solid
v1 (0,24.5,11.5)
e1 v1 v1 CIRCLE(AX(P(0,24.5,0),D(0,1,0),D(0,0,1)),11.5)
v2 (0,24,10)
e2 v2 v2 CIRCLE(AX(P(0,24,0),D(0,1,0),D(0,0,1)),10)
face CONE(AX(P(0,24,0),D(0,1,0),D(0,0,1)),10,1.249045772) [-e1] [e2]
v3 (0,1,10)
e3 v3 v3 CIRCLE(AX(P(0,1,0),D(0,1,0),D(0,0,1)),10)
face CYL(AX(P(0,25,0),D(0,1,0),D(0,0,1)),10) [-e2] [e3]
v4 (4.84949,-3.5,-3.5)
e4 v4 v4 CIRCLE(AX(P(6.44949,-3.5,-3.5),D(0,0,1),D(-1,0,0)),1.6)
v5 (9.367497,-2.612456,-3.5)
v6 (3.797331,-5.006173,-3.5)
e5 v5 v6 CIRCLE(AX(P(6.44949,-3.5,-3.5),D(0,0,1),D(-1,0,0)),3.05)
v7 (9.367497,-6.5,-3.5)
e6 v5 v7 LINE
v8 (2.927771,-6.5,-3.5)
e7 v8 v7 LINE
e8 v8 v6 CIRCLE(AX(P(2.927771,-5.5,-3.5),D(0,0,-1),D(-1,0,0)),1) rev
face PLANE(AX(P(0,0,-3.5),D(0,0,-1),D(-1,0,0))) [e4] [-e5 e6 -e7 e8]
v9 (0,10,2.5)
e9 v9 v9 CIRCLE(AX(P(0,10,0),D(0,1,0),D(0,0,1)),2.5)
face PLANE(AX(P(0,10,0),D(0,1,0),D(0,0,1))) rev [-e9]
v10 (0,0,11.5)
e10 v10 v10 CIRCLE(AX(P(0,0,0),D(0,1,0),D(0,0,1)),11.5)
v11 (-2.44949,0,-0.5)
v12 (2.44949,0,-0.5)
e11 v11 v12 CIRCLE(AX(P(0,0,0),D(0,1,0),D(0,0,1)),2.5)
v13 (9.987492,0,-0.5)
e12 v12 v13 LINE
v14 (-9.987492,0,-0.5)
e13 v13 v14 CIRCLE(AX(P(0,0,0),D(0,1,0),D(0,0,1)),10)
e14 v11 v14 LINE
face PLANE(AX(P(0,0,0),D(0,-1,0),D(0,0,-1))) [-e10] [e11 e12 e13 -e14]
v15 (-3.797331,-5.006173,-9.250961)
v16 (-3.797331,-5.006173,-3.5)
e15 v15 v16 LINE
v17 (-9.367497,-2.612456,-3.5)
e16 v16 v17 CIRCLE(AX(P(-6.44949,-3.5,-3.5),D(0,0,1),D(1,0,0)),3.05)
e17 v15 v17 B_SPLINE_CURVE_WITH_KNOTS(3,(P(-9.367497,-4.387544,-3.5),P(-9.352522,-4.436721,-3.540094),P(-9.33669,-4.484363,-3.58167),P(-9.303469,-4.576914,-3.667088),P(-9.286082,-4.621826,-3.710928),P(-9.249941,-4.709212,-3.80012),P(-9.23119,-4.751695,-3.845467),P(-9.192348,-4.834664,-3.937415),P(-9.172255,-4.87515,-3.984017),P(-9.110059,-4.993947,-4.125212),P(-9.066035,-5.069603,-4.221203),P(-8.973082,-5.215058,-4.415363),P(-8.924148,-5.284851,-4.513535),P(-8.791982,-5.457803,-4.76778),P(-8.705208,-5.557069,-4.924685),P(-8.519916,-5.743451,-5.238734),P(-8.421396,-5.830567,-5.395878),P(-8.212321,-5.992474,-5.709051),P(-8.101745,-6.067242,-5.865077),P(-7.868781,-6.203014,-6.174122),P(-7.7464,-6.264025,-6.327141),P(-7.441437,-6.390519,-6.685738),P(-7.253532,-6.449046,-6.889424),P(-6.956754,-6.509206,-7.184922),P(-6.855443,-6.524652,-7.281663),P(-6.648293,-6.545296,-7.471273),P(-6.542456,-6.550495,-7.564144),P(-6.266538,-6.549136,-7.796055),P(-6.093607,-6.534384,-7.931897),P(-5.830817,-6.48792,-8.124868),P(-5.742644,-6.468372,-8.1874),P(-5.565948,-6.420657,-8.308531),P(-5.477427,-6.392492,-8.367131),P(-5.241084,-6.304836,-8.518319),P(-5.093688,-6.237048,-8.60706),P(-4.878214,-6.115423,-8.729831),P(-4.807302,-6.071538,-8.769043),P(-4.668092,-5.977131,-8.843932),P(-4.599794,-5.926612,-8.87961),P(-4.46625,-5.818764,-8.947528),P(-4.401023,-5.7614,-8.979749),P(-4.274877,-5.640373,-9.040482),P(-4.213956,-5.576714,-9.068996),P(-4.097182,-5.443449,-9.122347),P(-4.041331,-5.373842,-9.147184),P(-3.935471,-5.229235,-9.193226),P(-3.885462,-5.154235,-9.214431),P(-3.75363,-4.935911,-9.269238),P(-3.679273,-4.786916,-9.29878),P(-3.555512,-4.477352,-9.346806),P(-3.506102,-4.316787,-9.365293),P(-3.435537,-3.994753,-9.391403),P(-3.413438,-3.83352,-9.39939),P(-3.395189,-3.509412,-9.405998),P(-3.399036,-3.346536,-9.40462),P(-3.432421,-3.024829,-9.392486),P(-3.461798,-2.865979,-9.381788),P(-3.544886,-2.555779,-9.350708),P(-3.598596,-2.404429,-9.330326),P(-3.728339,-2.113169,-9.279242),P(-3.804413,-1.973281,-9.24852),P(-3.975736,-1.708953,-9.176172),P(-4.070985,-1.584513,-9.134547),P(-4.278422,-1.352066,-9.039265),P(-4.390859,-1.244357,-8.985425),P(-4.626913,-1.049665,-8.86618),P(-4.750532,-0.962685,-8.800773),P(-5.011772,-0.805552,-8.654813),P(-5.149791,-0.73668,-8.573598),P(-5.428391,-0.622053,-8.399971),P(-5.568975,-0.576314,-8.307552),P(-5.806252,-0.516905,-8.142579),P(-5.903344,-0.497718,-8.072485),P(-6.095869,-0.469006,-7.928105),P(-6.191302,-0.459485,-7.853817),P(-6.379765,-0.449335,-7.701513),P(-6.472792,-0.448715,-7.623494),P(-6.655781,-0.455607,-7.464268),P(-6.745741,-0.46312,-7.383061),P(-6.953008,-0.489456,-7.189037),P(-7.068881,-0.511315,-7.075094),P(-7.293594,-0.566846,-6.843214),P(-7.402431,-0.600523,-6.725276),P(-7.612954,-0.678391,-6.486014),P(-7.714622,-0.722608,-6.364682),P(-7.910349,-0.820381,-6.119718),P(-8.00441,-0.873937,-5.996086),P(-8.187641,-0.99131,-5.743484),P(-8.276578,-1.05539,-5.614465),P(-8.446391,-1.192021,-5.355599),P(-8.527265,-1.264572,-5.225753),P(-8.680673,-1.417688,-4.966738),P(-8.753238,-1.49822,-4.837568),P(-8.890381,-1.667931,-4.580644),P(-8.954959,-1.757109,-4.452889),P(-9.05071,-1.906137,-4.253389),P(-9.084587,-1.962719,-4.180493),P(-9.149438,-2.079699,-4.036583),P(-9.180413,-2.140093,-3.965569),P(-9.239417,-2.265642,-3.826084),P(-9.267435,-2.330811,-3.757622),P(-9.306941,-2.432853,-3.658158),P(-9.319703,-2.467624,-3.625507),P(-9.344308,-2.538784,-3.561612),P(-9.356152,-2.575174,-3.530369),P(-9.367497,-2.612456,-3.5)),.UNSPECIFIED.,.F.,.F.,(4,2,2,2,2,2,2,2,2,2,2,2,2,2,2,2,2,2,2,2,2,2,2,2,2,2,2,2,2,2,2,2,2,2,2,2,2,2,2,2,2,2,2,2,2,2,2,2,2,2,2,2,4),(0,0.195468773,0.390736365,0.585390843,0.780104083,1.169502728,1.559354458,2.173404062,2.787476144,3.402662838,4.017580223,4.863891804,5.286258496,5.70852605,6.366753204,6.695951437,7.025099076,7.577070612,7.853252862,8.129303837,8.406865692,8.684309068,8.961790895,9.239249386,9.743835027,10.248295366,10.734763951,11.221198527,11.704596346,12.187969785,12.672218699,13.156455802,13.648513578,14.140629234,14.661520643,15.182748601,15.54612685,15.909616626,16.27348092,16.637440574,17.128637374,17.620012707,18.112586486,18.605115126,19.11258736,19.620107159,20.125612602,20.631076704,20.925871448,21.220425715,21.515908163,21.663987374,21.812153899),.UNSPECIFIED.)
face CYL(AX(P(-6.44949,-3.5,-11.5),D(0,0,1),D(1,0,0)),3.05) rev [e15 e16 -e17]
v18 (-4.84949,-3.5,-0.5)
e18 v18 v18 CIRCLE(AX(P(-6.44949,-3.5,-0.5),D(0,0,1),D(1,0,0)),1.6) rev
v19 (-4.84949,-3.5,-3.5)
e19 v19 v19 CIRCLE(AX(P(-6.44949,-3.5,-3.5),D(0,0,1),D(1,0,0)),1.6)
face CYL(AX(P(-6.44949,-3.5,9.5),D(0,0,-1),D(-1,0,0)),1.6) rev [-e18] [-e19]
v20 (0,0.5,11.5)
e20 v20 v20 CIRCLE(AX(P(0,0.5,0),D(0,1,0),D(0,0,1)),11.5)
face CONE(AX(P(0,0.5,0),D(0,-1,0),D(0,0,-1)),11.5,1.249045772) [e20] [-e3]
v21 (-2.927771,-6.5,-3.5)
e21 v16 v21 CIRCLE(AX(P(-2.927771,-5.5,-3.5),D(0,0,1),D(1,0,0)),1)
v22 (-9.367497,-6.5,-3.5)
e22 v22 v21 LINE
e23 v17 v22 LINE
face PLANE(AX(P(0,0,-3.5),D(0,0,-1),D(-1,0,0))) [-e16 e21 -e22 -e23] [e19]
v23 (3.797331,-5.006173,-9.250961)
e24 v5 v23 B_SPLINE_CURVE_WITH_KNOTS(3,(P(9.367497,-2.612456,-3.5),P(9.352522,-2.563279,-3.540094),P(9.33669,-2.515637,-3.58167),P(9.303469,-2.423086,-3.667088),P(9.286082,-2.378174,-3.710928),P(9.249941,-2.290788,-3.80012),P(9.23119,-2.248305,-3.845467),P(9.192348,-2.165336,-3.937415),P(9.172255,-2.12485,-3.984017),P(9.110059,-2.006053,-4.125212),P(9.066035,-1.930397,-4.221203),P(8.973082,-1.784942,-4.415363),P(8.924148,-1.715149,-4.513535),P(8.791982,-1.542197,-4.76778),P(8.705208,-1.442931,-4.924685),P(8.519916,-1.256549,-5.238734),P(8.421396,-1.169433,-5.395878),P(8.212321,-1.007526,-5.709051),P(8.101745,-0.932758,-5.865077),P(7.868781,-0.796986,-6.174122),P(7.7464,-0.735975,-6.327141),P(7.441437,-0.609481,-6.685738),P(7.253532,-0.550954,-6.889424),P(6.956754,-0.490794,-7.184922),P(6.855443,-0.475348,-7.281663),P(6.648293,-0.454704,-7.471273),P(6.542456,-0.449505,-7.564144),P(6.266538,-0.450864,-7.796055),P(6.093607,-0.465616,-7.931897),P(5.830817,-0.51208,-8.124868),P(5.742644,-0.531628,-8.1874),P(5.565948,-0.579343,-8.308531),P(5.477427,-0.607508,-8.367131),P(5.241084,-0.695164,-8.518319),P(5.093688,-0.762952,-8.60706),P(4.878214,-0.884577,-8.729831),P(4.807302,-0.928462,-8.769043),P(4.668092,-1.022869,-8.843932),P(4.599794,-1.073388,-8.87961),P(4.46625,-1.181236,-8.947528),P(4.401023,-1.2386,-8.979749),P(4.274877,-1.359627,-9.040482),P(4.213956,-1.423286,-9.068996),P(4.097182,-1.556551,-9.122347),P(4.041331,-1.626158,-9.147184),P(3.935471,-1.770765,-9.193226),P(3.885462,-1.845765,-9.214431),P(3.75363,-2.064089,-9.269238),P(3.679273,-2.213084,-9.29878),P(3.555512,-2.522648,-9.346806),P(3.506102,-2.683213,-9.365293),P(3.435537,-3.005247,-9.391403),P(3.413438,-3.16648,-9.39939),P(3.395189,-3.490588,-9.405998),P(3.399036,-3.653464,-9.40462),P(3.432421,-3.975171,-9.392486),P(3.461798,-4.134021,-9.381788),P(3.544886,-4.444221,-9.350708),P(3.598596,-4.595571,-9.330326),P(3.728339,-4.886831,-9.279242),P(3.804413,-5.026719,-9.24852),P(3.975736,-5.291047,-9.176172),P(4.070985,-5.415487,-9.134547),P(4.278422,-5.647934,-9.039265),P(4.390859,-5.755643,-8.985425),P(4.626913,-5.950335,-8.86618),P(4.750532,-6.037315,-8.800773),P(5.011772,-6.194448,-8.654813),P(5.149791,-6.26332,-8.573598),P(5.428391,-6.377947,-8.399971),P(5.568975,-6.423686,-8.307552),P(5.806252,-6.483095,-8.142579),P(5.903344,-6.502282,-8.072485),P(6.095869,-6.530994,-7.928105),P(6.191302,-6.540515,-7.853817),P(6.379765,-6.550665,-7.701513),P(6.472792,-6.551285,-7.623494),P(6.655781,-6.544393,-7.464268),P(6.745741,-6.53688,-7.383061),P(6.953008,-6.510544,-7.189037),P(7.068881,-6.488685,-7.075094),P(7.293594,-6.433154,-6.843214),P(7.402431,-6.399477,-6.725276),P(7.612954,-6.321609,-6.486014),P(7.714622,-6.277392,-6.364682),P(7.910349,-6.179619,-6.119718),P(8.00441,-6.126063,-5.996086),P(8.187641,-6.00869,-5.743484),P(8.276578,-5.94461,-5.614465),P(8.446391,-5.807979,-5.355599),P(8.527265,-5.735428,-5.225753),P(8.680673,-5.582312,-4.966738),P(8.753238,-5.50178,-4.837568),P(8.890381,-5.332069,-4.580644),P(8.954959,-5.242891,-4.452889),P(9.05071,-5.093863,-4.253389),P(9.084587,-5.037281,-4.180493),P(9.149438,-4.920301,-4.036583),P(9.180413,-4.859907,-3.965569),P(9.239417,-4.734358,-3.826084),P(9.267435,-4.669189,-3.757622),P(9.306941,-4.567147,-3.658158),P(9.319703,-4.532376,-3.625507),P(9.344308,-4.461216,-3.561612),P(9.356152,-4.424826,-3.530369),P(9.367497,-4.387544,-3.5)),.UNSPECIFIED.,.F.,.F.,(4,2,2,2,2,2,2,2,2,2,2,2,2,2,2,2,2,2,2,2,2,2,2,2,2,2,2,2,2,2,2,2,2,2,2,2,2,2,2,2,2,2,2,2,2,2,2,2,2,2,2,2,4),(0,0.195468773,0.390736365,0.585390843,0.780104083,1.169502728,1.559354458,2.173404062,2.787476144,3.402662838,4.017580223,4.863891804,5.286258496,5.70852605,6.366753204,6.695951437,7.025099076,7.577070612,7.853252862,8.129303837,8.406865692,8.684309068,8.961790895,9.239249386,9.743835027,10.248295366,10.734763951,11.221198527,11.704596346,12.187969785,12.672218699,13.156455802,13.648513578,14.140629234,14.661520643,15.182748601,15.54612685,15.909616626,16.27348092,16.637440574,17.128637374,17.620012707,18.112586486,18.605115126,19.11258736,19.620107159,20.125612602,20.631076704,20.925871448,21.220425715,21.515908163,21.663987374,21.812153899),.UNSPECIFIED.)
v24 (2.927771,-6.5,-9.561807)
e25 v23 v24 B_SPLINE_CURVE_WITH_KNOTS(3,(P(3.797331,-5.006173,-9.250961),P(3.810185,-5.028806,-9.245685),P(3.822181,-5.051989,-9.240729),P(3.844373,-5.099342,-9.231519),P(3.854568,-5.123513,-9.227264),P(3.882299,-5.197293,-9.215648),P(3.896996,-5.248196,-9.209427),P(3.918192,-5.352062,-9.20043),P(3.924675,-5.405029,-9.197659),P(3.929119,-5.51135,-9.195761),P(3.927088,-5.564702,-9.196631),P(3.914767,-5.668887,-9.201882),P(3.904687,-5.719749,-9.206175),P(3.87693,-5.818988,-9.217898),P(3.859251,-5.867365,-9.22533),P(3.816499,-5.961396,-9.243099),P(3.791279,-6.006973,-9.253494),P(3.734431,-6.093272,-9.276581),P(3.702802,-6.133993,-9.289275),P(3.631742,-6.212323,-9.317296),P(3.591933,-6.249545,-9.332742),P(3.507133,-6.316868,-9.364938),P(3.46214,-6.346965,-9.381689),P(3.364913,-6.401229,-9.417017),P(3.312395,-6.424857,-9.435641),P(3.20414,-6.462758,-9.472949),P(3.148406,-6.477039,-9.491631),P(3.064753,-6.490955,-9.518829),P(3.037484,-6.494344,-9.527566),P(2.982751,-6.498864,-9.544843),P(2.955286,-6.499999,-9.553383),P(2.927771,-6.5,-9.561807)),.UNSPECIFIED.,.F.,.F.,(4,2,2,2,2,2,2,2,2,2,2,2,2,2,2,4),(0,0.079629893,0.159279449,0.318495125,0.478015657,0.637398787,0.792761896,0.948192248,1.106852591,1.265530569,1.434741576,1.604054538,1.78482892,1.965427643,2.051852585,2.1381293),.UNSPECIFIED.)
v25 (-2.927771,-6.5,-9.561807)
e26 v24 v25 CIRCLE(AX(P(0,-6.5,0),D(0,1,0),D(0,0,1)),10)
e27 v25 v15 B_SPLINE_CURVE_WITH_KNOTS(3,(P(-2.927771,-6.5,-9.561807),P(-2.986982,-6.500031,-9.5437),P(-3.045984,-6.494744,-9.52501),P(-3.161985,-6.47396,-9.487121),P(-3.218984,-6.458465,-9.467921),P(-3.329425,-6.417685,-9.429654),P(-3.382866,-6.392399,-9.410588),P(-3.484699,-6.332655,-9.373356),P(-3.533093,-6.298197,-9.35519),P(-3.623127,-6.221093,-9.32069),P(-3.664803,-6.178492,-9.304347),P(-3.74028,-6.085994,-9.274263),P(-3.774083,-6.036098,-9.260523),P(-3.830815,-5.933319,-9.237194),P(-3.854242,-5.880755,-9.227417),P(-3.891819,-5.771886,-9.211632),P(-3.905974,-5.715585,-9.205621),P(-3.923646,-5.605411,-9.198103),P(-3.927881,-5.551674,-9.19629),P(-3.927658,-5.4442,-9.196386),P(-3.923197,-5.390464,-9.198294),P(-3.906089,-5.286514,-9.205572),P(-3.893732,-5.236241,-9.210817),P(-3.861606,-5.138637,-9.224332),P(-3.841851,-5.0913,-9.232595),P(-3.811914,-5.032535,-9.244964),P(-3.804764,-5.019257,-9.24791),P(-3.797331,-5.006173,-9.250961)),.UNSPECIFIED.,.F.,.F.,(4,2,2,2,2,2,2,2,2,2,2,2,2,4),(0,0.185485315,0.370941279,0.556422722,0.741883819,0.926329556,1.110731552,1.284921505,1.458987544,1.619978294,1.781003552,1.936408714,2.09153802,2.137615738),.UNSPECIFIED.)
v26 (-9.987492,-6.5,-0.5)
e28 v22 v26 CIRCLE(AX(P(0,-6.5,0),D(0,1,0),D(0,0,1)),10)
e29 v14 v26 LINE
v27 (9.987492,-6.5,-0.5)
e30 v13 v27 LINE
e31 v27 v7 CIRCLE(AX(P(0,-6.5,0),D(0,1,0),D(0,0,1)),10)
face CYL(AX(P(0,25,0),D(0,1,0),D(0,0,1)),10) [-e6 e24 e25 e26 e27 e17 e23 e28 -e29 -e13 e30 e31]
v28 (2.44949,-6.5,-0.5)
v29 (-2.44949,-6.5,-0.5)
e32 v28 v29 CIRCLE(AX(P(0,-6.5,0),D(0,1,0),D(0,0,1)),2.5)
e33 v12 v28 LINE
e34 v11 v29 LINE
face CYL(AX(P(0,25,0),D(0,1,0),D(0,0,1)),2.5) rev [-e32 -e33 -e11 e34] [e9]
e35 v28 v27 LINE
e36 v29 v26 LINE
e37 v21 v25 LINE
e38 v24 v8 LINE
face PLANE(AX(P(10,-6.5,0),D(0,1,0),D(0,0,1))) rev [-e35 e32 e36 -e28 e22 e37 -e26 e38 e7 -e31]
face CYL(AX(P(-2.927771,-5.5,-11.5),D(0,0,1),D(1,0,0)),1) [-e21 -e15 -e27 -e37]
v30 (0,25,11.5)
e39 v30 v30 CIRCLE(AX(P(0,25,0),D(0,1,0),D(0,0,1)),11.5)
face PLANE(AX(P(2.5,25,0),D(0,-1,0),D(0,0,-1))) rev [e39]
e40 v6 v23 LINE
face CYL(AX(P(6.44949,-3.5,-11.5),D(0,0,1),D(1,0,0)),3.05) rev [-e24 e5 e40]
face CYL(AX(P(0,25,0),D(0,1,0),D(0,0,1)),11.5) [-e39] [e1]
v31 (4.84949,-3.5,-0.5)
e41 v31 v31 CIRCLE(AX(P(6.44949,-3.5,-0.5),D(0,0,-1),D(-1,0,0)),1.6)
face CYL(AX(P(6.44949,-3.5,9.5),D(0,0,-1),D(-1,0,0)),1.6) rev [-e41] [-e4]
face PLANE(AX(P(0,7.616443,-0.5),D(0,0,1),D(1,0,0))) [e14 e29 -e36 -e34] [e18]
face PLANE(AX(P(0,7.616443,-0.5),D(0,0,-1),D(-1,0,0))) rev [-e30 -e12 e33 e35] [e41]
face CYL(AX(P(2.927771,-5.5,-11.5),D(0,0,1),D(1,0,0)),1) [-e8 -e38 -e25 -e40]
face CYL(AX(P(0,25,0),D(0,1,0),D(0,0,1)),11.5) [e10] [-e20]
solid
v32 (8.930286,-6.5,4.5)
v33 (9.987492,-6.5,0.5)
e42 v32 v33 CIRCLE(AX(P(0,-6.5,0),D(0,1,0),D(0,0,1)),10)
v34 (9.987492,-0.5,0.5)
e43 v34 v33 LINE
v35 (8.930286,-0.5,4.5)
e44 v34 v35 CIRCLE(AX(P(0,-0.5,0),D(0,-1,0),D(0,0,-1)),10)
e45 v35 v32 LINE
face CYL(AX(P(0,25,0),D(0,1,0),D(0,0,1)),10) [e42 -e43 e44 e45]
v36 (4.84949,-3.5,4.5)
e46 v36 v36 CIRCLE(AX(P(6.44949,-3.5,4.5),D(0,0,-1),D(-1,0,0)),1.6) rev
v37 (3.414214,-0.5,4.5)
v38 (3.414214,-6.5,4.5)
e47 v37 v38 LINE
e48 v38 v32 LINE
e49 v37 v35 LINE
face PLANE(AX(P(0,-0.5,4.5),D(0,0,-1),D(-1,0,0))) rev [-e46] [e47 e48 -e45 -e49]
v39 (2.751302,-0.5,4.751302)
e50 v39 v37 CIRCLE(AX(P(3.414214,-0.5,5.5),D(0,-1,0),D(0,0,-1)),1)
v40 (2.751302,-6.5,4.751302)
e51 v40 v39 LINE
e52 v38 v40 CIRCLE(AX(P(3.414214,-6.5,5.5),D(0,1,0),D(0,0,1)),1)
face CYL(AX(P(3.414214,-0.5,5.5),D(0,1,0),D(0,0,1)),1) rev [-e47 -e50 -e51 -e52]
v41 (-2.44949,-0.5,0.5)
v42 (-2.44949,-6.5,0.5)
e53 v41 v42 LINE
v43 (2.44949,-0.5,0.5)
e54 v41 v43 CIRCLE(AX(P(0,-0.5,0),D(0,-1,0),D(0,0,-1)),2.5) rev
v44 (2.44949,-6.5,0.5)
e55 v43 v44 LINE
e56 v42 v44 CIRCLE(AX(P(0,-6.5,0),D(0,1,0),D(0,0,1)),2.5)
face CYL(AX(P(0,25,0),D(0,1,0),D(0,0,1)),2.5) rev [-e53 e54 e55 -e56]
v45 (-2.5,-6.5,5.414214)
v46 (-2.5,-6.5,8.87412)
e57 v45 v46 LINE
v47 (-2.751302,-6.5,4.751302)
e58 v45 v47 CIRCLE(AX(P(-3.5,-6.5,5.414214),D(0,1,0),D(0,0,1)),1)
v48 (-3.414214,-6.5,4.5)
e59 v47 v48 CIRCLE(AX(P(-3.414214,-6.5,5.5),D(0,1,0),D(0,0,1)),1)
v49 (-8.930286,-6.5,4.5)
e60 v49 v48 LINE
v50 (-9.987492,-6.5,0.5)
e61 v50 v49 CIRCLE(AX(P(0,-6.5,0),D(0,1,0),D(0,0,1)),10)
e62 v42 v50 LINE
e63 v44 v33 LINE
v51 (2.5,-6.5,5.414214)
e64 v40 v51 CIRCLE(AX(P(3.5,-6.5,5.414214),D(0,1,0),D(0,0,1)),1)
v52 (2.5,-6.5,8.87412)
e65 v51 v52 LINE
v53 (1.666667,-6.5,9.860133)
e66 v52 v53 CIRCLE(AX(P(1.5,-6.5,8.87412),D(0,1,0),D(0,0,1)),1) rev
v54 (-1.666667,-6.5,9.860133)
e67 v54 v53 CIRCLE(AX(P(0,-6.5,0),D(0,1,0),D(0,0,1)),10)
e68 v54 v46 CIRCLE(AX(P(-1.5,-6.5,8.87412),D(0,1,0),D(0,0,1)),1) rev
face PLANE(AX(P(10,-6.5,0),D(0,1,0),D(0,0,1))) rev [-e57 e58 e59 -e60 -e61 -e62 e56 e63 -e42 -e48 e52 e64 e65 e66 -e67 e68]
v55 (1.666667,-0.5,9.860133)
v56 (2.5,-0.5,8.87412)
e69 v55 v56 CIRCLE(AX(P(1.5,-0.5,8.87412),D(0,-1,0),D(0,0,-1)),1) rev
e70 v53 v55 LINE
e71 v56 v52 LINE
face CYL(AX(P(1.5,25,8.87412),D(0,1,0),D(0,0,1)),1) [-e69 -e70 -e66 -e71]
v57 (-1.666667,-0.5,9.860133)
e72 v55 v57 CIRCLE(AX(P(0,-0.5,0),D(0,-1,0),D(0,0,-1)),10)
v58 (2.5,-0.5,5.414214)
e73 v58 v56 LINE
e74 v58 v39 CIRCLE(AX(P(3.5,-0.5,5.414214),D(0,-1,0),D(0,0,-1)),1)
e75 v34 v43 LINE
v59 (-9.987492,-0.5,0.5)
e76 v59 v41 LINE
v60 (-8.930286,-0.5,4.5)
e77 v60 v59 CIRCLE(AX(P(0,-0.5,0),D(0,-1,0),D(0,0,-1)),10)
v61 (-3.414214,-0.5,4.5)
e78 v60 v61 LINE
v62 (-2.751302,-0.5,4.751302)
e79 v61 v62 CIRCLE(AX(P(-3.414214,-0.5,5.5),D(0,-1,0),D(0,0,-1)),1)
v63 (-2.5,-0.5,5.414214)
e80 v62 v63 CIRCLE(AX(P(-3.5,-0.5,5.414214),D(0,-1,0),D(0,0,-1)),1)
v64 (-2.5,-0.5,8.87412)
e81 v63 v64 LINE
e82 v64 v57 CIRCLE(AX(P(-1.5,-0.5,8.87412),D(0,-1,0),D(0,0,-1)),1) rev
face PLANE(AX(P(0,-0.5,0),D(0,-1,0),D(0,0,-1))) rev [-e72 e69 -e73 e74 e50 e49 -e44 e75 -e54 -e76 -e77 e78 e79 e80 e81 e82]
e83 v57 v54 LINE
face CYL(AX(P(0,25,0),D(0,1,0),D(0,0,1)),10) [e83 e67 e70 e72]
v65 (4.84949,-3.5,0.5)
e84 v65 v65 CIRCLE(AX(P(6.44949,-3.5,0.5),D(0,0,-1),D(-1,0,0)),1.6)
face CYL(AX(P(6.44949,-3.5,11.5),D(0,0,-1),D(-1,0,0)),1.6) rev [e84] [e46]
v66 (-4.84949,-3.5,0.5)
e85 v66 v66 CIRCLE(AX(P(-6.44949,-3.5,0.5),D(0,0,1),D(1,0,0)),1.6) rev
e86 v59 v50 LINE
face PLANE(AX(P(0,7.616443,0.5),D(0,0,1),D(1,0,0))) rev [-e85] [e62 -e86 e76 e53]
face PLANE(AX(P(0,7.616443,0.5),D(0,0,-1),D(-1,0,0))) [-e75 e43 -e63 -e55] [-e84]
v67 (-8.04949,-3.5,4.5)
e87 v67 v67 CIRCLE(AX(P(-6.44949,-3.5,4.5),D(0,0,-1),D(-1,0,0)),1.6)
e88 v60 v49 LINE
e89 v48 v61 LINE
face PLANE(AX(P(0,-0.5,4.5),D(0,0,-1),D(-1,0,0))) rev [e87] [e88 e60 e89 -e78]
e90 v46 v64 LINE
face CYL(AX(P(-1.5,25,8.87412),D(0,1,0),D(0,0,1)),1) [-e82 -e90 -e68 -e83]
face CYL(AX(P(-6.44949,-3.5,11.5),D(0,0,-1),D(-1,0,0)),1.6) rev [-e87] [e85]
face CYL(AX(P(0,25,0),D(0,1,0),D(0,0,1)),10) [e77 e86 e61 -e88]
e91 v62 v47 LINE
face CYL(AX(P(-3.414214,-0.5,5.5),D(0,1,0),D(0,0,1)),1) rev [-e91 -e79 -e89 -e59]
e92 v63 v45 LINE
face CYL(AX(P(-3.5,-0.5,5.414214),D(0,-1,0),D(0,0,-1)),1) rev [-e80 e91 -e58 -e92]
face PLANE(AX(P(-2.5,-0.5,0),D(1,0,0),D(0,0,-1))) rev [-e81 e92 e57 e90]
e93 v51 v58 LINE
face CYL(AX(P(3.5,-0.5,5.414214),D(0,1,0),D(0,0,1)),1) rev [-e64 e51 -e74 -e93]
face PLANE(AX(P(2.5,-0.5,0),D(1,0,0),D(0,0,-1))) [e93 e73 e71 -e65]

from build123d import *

# Parameters (mm, degrees)
CUT_EXTRUDE1_DEPTH      = 6.5
INTERSECT1_START        = -6.5
INTERSECT1_DEPTH        = 6
INTERSECT1_2_DEPTH      = 6.5
CUT_EXTRUDE2_DEPTH      = 1
CUT_EXTRUDE2_DEPTH_BACK = 31.020826105
SKETCH5_R               = 1.6
CUT_EXTRUDE3_START      = -3
SKETCH5_3_R             = 3.05
SKETCH5_3_R_2           = 1.6
CUT_EXTRUDE3_DEPTH      = 28.020826105
SKETCH5_4_R             = 1.6
CUT_EXTRUDE4_DEPTH      = 31.020826105
CUT_EXTRUDE5_DEPTH      = 6
CHAMFER1_SIZE           = 0.5
FILLET1_R               = 1
FILLET2_R               = 1
INTERSECT2_START        = -10.0000001
INTERSECT2_DEPTH        = 6.5000001


with BuildPart() as part:
    # Sketch2 → Revolve1 (revolve)
    with BuildSketch(Plane.XY, mode=Mode.PRIVATE) as revolve1_sk:
        Polygon((2.5, 0), (2.5, 10), (0, 10), (0, 25), (2.5, 25), (11.5, 25), (11.5, 24.5), (10, 24), (10, 1), (11.5, 0.5), (11.5, 0), (10, 0), (10, -0.5), (10, -6.5), (2.5, -6.5), align=None)
    revolve(revolve1_sk.sketch.rotate(Axis((0, 25, 0), (0, -1, 0)), 90), axis=Axis((0, 25, 0), (0, -1, 0)))

    # Sketch3 → Cut-Extrude1 (cut)
    with BuildSketch(Plane.XZ.offset(6.5)):
        with BuildLine():
            Line((-9.987492178, -0.5), (-2.449489743, -0.5))
            ThreePointArc((-2.449489743, -0.5), (-2.5, 0), (-2.449489743, 0.5))
            Line((-2.449489743, 0.5), (-9.987492178, 0.5))
            ThreePointArc((-9.987492178, 0.5), (-10, 0), (-9.987492178, -0.5))
        make_face()
        with BuildLine():
            ThreePointArc((2.5, 0), (2.487340383, -0.251272405), (2.449489743, -0.5))
            Line((2.449489743, -0.5), (9.987492178, -0.5))
            ThreePointArc((9.987492178, -0.5), (9.996872555, -0.250078211), (10, 0))
            ThreePointArc((10, 0), (9.996872555, 0.250078211), (9.987492178, 0.5))
            Line((9.987492178, 0.5), (2.449489743, 0.5))
            ThreePointArc((2.449489743, 0.5), (2.487340383, 0.251272405), (2.5, 0))
        make_face()
    extrude(amount=-CUT_EXTRUDE1_DEPTH, mode=Mode.SUBTRACT)

    # Intersect1 2 outline → Intersect1 2 (cut)
    with BuildSketch(Plane(origin=(0, 0, 0), x_dir=(1, 0, 0), z_dir=(0, 1, 0)).offset(INTERSECT1_START)):
        with BuildLine():
            Line((-2.449489743, -0.5), (-9.987492178, -0.5))
            ThreePointArc((-9.987492178, -0.5), (0, -10), (9.987492178, -0.5))
            Line((9.987492178, -0.5), (2.449489743, -0.5))
            ThreePointArc((2.449489743, -0.5), (0, -2.5), (-2.449489743, -0.5))
        make_face()
    extrude(amount=INTERSECT1_2_DEPTH, mode=Mode.SUBTRACT)

    # Sketch5 → Cut-Extrude2 (cut, two sides: drawn at the far end of the back side and taken through both)
    with BuildSketch(Plane.XY.offset(-0.5).offset(-CUT_EXTRUDE2_DEPTH_BACK)):
        with Locations(Location((-6.449489743, -3.5, 0), (0, 0, 180))):
            Circle(SKETCH5_R)
        with Locations(Location((6.449489743, -3.5, 0), (0, 0, 180))):
            Circle(SKETCH5_R)
    extrude(amount=CUT_EXTRUDE2_DEPTH + CUT_EXTRUDE2_DEPTH_BACK, mode=Mode.SUBTRACT)

    # Sketch5<3> → Cut-Extrude3 (cut, through all)
    # profile 1 of 2: a face of its own
    with BuildSketch(Plane.XY.offset(-0.5).offset(CUT_EXTRUDE3_START)):
        with Locations((-6.449489743, -3.5)):
            Circle(SKETCH5_3_R)
        with Locations((-6.449489743, -3.5)):
            Circle(SKETCH5_3_R_2, mode=Mode.SUBTRACT)
    # profile 2 of 2: a face of its own
    with BuildSketch(Plane.XY.offset(-0.5).offset(CUT_EXTRUDE3_START)):
        with Locations((6.449489743, -3.5)):
            Circle(SKETCH5_3_R)
        with Locations(Location((6.449489743, -3.5, 0), (0, 0, 180))):
            Circle(SKETCH5_3_R_2, mode=Mode.SUBTRACT)
    extrude(amount=-CUT_EXTRUDE3_DEPTH, mode=Mode.SUBTRACT)

    # Fillet2
    # the kernel refuses this fillet: 1 mm, written as the material it takes off along each edge
    with BuildSketch(Plane(origin=(5.899489743, -6.5, -15.503701116), x_dir=(-0.8151459123720453, 0.5792556789045281, 0), z_dir=(0, 0, 1))) as fillet2_piece_1:
        with BuildLine():
            CenterArc((3.001639729, 0.906238807), FILLET2_R, 125.398208072, 119.592441671)
            Line((2.42238405, 1.721384719), (0, 0))
            ThreePointArc((0, 0), (1.289436785, 0.285971639), (2.57887357, 0))
        make_face()
    extrude(amount=12.003701116, mode=Mode.SUBTRACT)
    with BuildSketch(Plane(origin=(6.999489743, -6.5, -14.571224371), x_dir=(0.8151459123720456, 0.5792556789045277, 0), z_dir=(0, 0, 1))) as fillet2_piece_2:
        with BuildLine():
            CenterArc((3.001639729, -0.906238807), FILLET2_R, 115.009350257, 119.592441671)
            Line((2.42238405, -1.721384719), (0, 0))
            ThreePointArc((0, 0), (1.289436785, -0.285971639), (2.57887357, 0))
        make_face()
    extrude(amount=11.071224371, mode=Mode.SUBTRACT)
    with BuildSketch(Plane(origin=(-6.999489743, -6.5, -14.571224371), x_dir=(-0.8151459123720448, 0.5792556789045287, 0), z_dir=(0, 0, 1))) as fillet2_piece_3:
        with BuildLine():
            CenterArc((3.001639729, 0.906238807), FILLET2_R, 125.398208072, 119.592441671)
            Line((2.42238405, 1.721384719), (0, 0))
            ThreePointArc((0, 0), (1.289436785, 0.285971639), (2.57887357, 0))
        make_face()
    extrude(amount=11.071224371, mode=Mode.SUBTRACT)
    with BuildSketch(Plane(origin=(-5.899489743, -6.5, -15.503701116), x_dir=(0.8151459123720447, 0.579255678904529, 0), z_dir=(0, 0, 1))) as fillet2_piece_4:
        with BuildLine():
            CenterArc((3.001639729, -0.906238807), FILLET2_R, 115.009350257, 119.592441671)
            Line((2.42238405, -1.721384719), (0, 0))
            ThreePointArc((0, 0), (1.289436785, -0.285971639), (2.57887357, 0))
        make_face()
    extrude(amount=12.003701116, mode=Mode.SUBTRACT)

    # Intersect2: read off the stored shape, not the designer's step
    # Intersect2 outline → Intersect2 (cut)
    with BuildSketch(Plane.XY.offset(INTERSECT2_START)):
        with BuildLine():
            ThreePointArc((-9.101644142, -5.006179618), (-9.251694739, -4.704220561), (-9.367496998, -4.387543611))
            Line((-9.367496998, -4.387543611), (-9.789533465, -3))
            Line((-9.789533465, -3), (-11, -3))
            Line((-11, -3), (-11, -7.533475387))
            Line((-11, -7.533475387), (-9.367496998, -6.297203197))
            ThreePointArc((-9.367496998, -6.297203197), (-8.991758319, -5.70168832), (-9.101644142, -5.006179618))
        make_face()
        with BuildLine():
            Line((11, -3), (9.789533466, -3))
            Line((9.789533466, -3), (9.367496998, -4.387543611))
            ThreePointArc((9.367496998, -4.387543611), (9.251696278, -4.70421698), (9.101647992, -5.00617284))
            ThreePointArc((9.101647992, -5.00617284), (8.991758319, -5.70168832), (9.367496998, -6.297203197))
            Line((9.367496998, -6.297203197), (11, -7.533475387))
            Line((11, -7.533475387), (11, -3))
        make_face()
    extrude(amount=INTERSECT2_DEPTH, mode=Mode.SUBTRACT)


with BuildPart() as body_2:
    # Intersect1: read off the stored shape, not the designer's step
    # Intersect1 outline → Intersect1 (new body)
    with BuildSketch(Plane(origin=(0, 0, 0), x_dir=(1, 0, 0), z_dir=(0, 1, 0)).offset(INTERSECT1_START)):
        with BuildLine():
            ThreePointArc((2.449489743, -0.5), (0, -2.5), (-2.449489743, -0.5))
            Line((-2.449489743, -0.5), (-9.987492178, -0.5))
            ThreePointArc((-9.987492178, -0.5), (0, -10), (9.987492178, -0.5))
            Line((9.987492178, -0.5), (2.449489743, -0.5))
        make_face()
    extrude(amount=INTERSECT1_DEPTH)

    # Sketch5<4> → Cut-Extrude4 (cut, through all)
    with BuildSketch(Plane.XY.offset(-0.5)):
        with Locations(Location((-6.449489743, -3.5, 0), (0, 0, 180))):
            Circle(SKETCH5_4_R)
        with Locations(Location((6.449489743, -3.5, 0), (0, 0, 180))):
            Circle(SKETCH5_4_R)
    extrude(amount=CUT_EXTRUDE4_DEPTH, mode=Mode.SUBTRACT)

    # Sketch7 → Cut-Extrude5 (cut)
    with BuildSketch(Plane.XZ.offset(6.5)):
        with BuildLine():
            ThreePointArc((-2.5, 9.682458366), (-6.275135506, 7.786056408), (-8.93028555, 4.5))
            Line((-8.93028555, 4.5), (-2.5, 4.5))
            Line((-2.5, 4.5), (-2.5, 9.682458366))
        make_face()
        with BuildLine():
            Line((2.5, 9.682458366), (2.5, 4.5))
            Line((2.5, 4.5), (8.93028555, 4.5))
            ThreePointArc((8.93028555, 4.5), (6.275135506, 7.786056408), (2.5, 9.682458366))
        make_face()
    extrude(amount=-CUT_EXTRUDE5_DEPTH, mode=Mode.SUBTRACT)

    # Chamfer1
    chamfer1_edges = [body_2.edges().sort_by_distance(p)[0] for p in [
        (-2.5, -3.5, 4.5),
        (2.5, -3.5, 4.5),
    ]]
    chamfer(chamfer1_edges, length=CHAMFER1_SIZE)

    # Fillet1
    # the kernel refuses this fillet: 1 mm, written as the material it adds along each edge
    with BuildSketch(Plane(origin=(3, -6.5, 4.5), x_dir=(1, 0, 0), z_dir=(0, 1, 0)), Plane(origin=(2.5, -6.5, 5), x_dir=(0.7071067811865481, 0, -0.707106781186547), z_dir=(0, 1, 0)), Plane(origin=(-2.5, -6.5, 5), x_dir=(0, 0, 1), z_dir=(0, 1, 0)), Plane(origin=(-3, -6.5, 4.5), x_dir=(0.7071067811865481, 0, 0.707106781186547), z_dir=(0, 1, 0))) as fillet1_piece_1:
        with BuildLine():
            CenterArc((FILLET1_R * 0.414213562373, -FILLET1_R), FILLET1_R, 90, 45)
            Line((-FILLET1_R * 0.292893218813, -FILLET1_R * 0.292893218813), (0, 0))
            Line((0, 0), (FILLET1_R * 0.414213562373, 0))
        make_face()
    extrude(amount=6)
    # the kernel refuses this fillet: 1 mm, written as the material it takes off along each edge
    with BuildSketch(Plane(origin=(-2.5, -8.630159487, 9.682458366), x_dir=(0.9780175364256274, 0, 0.20852265690794025), z_dir=(0, 1, 0))) as fillet1_2_piece_1:
        with BuildLine():
            CenterArc((0.809460605, 0.999092072), FILLET1_R, 192.035790207, 80.405931773)
            Line((-0.168556932, 0.790569415), (0, 0))
            ThreePointArc((0, 0), (0.426031897, -0.009079281), (0.852063795, 0))
        make_face()
    extrude(amount=10.260318973, mode=Mode.SUBTRACT)
    with BuildSketch(Plane(origin=(2.5, -8.630159487, 9.682458366), x_dir=(0, 0, -1), z_dir=(0, 1, 0))) as fillet1_2_piece_2:
        with BuildLine():
            CenterArc((0.808338691, 1), FILLET1_R, 189.594068227, 80.405931773)
            ThreePointArc((-0.177674606, 0.833333333), (-0.097716999, 0.414773431), (0, 0))
            Line((0, 0), (0.808338691, 0))
        make_face()
    extrude(amount=10.260318973, mode=Mode.SUBTRACT)


solid = Compound([part.part, body_2.part])
